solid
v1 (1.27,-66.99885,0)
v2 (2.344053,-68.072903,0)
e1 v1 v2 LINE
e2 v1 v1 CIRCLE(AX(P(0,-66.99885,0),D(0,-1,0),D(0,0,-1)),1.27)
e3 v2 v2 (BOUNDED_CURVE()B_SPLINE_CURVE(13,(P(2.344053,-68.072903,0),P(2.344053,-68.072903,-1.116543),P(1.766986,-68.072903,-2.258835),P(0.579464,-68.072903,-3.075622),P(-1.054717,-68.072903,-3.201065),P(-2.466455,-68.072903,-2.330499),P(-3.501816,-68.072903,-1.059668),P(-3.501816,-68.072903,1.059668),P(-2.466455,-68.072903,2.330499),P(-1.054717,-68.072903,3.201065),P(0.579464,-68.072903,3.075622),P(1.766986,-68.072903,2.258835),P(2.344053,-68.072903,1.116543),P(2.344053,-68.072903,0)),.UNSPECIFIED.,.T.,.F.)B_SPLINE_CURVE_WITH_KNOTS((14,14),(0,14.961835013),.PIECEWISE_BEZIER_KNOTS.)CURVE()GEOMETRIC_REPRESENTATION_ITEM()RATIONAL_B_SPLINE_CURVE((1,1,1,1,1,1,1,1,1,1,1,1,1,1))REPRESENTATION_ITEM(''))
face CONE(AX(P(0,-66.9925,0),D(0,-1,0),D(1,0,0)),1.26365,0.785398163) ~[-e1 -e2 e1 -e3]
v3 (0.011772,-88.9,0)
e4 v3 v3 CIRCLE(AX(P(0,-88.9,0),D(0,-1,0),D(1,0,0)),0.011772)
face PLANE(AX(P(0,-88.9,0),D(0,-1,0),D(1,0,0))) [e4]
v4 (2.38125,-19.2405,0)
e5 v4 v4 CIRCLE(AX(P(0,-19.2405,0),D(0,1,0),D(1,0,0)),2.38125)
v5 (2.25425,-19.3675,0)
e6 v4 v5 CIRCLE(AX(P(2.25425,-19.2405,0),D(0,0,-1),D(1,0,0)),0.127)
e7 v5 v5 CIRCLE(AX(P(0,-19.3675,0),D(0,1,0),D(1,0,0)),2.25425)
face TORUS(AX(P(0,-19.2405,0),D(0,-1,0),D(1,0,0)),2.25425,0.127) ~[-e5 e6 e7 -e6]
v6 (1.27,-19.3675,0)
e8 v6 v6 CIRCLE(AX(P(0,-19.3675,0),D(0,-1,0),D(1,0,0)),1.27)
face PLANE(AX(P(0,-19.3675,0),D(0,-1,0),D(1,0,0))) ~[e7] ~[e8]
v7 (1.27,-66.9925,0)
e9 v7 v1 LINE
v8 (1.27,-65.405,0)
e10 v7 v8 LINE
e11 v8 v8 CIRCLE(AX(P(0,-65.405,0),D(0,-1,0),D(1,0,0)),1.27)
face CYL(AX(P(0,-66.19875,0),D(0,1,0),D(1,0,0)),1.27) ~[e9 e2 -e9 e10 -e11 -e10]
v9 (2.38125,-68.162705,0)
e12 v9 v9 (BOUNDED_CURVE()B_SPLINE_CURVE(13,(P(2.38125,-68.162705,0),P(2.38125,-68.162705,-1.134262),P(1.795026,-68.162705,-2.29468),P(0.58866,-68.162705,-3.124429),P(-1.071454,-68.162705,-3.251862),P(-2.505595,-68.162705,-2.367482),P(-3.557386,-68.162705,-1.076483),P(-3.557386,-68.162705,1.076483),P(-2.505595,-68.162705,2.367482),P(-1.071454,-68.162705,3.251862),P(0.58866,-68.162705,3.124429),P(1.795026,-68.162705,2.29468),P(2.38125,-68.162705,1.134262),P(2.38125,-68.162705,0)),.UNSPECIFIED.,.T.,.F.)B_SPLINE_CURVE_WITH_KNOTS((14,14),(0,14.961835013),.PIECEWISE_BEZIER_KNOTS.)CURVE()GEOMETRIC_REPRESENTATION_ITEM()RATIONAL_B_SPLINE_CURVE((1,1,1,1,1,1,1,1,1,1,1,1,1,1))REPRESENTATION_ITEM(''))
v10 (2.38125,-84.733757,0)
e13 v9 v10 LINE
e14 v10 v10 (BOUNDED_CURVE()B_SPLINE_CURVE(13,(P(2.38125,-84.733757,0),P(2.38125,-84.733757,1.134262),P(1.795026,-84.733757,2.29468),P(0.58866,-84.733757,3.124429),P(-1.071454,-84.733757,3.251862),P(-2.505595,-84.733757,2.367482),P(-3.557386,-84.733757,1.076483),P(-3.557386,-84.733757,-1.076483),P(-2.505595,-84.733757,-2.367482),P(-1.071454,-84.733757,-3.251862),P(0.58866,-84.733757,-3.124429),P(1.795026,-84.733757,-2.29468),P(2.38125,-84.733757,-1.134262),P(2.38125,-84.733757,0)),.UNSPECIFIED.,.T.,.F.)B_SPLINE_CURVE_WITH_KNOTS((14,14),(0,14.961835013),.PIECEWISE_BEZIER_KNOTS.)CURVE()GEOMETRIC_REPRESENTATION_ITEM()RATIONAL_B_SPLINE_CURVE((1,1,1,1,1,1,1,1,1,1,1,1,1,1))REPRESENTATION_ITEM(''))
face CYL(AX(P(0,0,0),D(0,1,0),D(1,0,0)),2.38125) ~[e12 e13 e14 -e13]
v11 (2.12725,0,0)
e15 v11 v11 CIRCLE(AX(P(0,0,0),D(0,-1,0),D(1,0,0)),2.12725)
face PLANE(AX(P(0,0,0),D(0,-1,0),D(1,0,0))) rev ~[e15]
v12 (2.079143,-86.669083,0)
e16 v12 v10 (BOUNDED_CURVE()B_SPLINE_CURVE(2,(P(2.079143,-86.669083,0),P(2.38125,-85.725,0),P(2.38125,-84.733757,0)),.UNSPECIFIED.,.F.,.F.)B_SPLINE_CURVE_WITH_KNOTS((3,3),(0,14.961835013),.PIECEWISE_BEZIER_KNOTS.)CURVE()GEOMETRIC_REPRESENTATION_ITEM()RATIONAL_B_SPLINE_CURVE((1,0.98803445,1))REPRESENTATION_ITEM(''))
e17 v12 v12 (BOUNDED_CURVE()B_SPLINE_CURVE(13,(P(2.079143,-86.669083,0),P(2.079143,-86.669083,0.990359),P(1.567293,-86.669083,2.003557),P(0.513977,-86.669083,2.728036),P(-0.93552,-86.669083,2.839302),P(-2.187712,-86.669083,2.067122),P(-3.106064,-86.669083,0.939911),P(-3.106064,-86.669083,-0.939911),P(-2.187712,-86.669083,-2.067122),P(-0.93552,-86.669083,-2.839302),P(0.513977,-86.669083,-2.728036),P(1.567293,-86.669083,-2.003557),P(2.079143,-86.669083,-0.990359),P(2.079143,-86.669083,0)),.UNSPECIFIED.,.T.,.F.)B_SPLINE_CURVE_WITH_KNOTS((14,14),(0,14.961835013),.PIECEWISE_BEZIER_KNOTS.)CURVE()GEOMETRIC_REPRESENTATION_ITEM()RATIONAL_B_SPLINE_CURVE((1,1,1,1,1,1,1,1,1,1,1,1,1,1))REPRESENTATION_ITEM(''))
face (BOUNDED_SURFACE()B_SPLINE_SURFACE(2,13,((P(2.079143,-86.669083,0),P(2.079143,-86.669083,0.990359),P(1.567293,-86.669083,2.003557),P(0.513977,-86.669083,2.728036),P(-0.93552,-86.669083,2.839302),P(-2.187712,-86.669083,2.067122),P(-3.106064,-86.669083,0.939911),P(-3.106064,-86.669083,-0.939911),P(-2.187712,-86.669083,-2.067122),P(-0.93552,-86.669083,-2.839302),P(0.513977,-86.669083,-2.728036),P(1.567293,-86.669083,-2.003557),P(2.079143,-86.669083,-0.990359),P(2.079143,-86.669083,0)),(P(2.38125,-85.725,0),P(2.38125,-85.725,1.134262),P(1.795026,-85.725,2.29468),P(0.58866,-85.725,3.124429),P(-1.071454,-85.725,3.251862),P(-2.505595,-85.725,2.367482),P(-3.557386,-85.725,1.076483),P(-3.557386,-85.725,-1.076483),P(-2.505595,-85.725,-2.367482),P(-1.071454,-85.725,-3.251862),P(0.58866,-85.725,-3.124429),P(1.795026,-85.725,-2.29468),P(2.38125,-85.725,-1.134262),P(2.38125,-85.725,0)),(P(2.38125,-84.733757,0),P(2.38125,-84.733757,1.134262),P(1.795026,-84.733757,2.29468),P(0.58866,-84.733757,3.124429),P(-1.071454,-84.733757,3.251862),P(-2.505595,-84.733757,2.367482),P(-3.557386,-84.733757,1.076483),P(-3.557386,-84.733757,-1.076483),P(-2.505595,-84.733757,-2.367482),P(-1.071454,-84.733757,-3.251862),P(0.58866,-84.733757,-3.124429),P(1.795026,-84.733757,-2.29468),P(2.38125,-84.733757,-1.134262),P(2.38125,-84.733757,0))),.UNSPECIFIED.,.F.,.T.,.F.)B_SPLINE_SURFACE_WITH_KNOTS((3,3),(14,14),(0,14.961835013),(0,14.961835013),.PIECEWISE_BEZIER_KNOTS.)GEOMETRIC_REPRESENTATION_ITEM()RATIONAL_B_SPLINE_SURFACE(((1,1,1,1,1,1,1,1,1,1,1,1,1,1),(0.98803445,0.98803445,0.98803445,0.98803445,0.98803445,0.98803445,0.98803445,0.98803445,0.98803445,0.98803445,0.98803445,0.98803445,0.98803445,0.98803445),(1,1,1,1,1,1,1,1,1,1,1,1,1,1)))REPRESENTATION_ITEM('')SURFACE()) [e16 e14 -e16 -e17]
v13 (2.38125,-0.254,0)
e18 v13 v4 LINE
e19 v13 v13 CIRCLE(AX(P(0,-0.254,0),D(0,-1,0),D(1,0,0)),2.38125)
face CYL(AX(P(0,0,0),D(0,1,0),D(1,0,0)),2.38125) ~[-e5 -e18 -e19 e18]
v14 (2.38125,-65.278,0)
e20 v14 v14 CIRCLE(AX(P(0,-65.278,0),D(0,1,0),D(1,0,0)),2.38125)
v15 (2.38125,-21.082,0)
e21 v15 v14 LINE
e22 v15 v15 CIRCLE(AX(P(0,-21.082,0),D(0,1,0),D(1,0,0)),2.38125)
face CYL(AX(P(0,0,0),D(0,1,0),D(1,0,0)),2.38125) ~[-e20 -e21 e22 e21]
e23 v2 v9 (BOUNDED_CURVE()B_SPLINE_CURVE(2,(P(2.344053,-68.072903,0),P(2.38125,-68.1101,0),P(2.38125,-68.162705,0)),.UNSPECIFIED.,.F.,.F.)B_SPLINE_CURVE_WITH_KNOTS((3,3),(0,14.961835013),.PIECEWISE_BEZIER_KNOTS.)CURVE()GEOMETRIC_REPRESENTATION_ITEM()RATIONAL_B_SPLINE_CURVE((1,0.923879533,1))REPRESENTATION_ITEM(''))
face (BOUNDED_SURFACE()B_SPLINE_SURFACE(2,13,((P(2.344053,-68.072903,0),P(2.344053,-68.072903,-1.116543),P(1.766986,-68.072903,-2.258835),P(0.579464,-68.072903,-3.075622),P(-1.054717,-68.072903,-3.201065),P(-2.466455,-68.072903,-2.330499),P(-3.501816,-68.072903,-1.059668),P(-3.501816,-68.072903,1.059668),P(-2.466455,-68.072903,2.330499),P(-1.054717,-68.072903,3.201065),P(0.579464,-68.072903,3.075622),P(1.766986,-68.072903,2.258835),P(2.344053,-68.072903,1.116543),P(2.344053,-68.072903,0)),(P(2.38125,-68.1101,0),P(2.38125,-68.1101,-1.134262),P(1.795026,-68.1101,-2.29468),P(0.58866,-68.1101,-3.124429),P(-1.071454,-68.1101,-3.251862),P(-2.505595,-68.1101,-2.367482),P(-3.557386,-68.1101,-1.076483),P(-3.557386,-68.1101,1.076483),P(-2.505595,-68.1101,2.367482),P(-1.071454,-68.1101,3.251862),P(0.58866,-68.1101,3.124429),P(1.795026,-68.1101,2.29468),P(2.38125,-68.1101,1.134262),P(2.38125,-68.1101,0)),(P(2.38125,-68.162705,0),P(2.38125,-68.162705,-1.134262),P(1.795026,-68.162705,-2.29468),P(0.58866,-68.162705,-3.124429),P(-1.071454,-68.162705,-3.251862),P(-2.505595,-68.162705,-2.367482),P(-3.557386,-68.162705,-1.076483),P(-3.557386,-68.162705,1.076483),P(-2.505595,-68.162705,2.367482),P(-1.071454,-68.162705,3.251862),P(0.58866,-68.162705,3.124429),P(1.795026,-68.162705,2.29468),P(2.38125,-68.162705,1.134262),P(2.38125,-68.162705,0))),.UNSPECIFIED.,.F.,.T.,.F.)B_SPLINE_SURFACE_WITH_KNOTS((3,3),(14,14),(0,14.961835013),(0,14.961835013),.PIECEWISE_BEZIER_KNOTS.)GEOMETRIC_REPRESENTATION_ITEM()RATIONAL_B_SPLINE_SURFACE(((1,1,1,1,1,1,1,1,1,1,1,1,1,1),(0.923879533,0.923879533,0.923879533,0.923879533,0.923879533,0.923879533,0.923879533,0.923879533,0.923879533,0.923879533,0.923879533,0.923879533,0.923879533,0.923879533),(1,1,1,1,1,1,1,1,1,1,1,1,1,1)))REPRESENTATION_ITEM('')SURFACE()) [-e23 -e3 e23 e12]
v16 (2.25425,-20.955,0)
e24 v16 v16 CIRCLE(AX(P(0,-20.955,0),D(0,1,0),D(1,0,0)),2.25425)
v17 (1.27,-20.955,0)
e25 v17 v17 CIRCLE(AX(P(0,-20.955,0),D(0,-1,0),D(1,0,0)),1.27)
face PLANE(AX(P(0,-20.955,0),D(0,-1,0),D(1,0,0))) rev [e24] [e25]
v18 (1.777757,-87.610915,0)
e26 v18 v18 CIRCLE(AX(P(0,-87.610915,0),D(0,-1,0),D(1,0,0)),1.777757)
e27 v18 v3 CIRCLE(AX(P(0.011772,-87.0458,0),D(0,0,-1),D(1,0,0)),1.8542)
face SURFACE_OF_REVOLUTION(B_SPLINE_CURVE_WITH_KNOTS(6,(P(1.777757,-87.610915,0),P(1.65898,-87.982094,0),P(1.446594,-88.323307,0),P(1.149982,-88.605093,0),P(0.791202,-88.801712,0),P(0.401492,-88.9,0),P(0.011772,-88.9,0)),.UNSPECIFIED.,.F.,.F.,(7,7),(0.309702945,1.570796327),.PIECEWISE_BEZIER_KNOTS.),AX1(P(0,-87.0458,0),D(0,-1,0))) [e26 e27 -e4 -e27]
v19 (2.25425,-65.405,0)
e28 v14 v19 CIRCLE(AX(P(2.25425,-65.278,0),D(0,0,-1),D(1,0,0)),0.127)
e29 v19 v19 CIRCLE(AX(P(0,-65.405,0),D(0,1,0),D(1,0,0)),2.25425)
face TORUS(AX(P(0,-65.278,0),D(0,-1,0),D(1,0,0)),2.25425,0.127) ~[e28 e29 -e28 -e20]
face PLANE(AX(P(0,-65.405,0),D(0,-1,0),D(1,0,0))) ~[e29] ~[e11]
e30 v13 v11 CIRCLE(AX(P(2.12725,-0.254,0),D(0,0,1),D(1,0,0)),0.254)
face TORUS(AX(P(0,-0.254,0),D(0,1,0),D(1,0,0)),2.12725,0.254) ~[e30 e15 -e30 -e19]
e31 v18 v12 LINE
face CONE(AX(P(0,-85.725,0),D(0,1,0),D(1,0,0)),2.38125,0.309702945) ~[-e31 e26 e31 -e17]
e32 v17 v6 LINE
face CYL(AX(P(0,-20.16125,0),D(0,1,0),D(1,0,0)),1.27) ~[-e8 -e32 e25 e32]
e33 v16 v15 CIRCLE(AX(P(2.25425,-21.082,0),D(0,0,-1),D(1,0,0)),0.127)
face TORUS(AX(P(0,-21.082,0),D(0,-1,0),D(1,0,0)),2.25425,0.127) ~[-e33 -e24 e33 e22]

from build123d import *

# Parameters (mm, degrees)
F0_R        = 2.38125
F1_DEPTH    = 88.9
F2_SIZE2    = 3.175
F2_SIZE     = 1.016
F3_R        = 1.8542
F4_R        = 6.35
F5_R        = 0.254
F6_W        = 3.5311071049
F6_H        = 1.5875
F8_S5_R     = 1.27
F8_T6_DEPTH = 5
F9_R        = 0.127


# Not quite as in the source:
# - a fillet or chamfer that OpenCascade refuses, or shapes differently, is made with other operations: its cross-section is extruded or revolved along the edge and cut away or added


with BuildPart() as f1:
    # F0 (on Front) → F1 (new body)
    with BuildSketch(Plane.XZ):
        Circle(F0_R)
    extrude(amount=F1_DEPTH)

    # F2
    f2_edges = [f1.edges().sort_by_distance(p)[0] for p in [
        (-2.38125, -88.9, 0),
    ]]
    f2_side = f1.faces().sort_by_distance((0, -88.9, 0))[0]
    chamfer(f2_edges, length=F2_SIZE, length2=F2_SIZE2, reference=f2_side)

    # F3
    f3_edges = [f1.edges().sort_by_distance(p)[0] for p in [
        (-1.36525, -88.9, 0),
    ]]
    fillet(f3_edges, radius=F3_R)

    # F4
    f4_edges = [f1.edges().sort_by_distance(p)[0] for p in [
        (-2.38125, -85.725, 0),
    ]]
    fillet(f4_edges, radius=F4_R)

    # F5
    f5_edges = [f1.edges().sort_by_distance(p)[0] for p in [
        (-2.38125, 0, 0),
    ]]
    fillet(f5_edges, radius=F5_R)

    # F6 (on Top) → F7 (revolve, cut)
    with BuildSketch(Plane.XY):
        with Locations((3.0355535524, -20.16125)):
            Rectangle(F6_W, F6_H)
        with Locations((3.0355535524, -66.19875)):
            Rectangle(F6_W, F6_H)
    revolve(axis=Axis((0, -11.8038663641, 0), (0, -1, 0)), mode=Mode.SUBTRACT)

    # F8: chamfer of 1.1176 on 1 edges, made by hand


with BuildPart() as f8_tool2:
    # F8_s3 → F8_t4 (revolve)
    with BuildSketch(Plane.XY):
        Polygon((1.26365, -66.9925), (2.38125, -68.1101), (2.38125, -66.9925), align=None)
    revolve(axis=Axis((0, -66.9925, 0), (0, 1, 0)))

    # F8_s5 → F8_t6 (cut, symmetric)
    with BuildSketch(Plane.XZ.offset(67.6)):
        Circle(F8_S5_R)
    extrude(amount=F8_T6_DEPTH, both=True, mode=Mode.SUBTRACT)


with BuildPart() as f1_1:
    add(f1.part)

    # F8_t1: cut F8_tool2
    add(f8_tool2.part, mode=Mode.SUBTRACT)

    # F9
    f9_edges = [f1_1.edges().sort_by_distance(p)[0] for p in [
        (-2.38125, -19.3675, 0),
        (-2.38125, -20.955, 0),
        (-2.38125, -65.405, 0),
        (-2.38125, -68.1101, 0),
    ]]
    fillet(f9_edges, radius=F9_R)


solid = f1_1.part
